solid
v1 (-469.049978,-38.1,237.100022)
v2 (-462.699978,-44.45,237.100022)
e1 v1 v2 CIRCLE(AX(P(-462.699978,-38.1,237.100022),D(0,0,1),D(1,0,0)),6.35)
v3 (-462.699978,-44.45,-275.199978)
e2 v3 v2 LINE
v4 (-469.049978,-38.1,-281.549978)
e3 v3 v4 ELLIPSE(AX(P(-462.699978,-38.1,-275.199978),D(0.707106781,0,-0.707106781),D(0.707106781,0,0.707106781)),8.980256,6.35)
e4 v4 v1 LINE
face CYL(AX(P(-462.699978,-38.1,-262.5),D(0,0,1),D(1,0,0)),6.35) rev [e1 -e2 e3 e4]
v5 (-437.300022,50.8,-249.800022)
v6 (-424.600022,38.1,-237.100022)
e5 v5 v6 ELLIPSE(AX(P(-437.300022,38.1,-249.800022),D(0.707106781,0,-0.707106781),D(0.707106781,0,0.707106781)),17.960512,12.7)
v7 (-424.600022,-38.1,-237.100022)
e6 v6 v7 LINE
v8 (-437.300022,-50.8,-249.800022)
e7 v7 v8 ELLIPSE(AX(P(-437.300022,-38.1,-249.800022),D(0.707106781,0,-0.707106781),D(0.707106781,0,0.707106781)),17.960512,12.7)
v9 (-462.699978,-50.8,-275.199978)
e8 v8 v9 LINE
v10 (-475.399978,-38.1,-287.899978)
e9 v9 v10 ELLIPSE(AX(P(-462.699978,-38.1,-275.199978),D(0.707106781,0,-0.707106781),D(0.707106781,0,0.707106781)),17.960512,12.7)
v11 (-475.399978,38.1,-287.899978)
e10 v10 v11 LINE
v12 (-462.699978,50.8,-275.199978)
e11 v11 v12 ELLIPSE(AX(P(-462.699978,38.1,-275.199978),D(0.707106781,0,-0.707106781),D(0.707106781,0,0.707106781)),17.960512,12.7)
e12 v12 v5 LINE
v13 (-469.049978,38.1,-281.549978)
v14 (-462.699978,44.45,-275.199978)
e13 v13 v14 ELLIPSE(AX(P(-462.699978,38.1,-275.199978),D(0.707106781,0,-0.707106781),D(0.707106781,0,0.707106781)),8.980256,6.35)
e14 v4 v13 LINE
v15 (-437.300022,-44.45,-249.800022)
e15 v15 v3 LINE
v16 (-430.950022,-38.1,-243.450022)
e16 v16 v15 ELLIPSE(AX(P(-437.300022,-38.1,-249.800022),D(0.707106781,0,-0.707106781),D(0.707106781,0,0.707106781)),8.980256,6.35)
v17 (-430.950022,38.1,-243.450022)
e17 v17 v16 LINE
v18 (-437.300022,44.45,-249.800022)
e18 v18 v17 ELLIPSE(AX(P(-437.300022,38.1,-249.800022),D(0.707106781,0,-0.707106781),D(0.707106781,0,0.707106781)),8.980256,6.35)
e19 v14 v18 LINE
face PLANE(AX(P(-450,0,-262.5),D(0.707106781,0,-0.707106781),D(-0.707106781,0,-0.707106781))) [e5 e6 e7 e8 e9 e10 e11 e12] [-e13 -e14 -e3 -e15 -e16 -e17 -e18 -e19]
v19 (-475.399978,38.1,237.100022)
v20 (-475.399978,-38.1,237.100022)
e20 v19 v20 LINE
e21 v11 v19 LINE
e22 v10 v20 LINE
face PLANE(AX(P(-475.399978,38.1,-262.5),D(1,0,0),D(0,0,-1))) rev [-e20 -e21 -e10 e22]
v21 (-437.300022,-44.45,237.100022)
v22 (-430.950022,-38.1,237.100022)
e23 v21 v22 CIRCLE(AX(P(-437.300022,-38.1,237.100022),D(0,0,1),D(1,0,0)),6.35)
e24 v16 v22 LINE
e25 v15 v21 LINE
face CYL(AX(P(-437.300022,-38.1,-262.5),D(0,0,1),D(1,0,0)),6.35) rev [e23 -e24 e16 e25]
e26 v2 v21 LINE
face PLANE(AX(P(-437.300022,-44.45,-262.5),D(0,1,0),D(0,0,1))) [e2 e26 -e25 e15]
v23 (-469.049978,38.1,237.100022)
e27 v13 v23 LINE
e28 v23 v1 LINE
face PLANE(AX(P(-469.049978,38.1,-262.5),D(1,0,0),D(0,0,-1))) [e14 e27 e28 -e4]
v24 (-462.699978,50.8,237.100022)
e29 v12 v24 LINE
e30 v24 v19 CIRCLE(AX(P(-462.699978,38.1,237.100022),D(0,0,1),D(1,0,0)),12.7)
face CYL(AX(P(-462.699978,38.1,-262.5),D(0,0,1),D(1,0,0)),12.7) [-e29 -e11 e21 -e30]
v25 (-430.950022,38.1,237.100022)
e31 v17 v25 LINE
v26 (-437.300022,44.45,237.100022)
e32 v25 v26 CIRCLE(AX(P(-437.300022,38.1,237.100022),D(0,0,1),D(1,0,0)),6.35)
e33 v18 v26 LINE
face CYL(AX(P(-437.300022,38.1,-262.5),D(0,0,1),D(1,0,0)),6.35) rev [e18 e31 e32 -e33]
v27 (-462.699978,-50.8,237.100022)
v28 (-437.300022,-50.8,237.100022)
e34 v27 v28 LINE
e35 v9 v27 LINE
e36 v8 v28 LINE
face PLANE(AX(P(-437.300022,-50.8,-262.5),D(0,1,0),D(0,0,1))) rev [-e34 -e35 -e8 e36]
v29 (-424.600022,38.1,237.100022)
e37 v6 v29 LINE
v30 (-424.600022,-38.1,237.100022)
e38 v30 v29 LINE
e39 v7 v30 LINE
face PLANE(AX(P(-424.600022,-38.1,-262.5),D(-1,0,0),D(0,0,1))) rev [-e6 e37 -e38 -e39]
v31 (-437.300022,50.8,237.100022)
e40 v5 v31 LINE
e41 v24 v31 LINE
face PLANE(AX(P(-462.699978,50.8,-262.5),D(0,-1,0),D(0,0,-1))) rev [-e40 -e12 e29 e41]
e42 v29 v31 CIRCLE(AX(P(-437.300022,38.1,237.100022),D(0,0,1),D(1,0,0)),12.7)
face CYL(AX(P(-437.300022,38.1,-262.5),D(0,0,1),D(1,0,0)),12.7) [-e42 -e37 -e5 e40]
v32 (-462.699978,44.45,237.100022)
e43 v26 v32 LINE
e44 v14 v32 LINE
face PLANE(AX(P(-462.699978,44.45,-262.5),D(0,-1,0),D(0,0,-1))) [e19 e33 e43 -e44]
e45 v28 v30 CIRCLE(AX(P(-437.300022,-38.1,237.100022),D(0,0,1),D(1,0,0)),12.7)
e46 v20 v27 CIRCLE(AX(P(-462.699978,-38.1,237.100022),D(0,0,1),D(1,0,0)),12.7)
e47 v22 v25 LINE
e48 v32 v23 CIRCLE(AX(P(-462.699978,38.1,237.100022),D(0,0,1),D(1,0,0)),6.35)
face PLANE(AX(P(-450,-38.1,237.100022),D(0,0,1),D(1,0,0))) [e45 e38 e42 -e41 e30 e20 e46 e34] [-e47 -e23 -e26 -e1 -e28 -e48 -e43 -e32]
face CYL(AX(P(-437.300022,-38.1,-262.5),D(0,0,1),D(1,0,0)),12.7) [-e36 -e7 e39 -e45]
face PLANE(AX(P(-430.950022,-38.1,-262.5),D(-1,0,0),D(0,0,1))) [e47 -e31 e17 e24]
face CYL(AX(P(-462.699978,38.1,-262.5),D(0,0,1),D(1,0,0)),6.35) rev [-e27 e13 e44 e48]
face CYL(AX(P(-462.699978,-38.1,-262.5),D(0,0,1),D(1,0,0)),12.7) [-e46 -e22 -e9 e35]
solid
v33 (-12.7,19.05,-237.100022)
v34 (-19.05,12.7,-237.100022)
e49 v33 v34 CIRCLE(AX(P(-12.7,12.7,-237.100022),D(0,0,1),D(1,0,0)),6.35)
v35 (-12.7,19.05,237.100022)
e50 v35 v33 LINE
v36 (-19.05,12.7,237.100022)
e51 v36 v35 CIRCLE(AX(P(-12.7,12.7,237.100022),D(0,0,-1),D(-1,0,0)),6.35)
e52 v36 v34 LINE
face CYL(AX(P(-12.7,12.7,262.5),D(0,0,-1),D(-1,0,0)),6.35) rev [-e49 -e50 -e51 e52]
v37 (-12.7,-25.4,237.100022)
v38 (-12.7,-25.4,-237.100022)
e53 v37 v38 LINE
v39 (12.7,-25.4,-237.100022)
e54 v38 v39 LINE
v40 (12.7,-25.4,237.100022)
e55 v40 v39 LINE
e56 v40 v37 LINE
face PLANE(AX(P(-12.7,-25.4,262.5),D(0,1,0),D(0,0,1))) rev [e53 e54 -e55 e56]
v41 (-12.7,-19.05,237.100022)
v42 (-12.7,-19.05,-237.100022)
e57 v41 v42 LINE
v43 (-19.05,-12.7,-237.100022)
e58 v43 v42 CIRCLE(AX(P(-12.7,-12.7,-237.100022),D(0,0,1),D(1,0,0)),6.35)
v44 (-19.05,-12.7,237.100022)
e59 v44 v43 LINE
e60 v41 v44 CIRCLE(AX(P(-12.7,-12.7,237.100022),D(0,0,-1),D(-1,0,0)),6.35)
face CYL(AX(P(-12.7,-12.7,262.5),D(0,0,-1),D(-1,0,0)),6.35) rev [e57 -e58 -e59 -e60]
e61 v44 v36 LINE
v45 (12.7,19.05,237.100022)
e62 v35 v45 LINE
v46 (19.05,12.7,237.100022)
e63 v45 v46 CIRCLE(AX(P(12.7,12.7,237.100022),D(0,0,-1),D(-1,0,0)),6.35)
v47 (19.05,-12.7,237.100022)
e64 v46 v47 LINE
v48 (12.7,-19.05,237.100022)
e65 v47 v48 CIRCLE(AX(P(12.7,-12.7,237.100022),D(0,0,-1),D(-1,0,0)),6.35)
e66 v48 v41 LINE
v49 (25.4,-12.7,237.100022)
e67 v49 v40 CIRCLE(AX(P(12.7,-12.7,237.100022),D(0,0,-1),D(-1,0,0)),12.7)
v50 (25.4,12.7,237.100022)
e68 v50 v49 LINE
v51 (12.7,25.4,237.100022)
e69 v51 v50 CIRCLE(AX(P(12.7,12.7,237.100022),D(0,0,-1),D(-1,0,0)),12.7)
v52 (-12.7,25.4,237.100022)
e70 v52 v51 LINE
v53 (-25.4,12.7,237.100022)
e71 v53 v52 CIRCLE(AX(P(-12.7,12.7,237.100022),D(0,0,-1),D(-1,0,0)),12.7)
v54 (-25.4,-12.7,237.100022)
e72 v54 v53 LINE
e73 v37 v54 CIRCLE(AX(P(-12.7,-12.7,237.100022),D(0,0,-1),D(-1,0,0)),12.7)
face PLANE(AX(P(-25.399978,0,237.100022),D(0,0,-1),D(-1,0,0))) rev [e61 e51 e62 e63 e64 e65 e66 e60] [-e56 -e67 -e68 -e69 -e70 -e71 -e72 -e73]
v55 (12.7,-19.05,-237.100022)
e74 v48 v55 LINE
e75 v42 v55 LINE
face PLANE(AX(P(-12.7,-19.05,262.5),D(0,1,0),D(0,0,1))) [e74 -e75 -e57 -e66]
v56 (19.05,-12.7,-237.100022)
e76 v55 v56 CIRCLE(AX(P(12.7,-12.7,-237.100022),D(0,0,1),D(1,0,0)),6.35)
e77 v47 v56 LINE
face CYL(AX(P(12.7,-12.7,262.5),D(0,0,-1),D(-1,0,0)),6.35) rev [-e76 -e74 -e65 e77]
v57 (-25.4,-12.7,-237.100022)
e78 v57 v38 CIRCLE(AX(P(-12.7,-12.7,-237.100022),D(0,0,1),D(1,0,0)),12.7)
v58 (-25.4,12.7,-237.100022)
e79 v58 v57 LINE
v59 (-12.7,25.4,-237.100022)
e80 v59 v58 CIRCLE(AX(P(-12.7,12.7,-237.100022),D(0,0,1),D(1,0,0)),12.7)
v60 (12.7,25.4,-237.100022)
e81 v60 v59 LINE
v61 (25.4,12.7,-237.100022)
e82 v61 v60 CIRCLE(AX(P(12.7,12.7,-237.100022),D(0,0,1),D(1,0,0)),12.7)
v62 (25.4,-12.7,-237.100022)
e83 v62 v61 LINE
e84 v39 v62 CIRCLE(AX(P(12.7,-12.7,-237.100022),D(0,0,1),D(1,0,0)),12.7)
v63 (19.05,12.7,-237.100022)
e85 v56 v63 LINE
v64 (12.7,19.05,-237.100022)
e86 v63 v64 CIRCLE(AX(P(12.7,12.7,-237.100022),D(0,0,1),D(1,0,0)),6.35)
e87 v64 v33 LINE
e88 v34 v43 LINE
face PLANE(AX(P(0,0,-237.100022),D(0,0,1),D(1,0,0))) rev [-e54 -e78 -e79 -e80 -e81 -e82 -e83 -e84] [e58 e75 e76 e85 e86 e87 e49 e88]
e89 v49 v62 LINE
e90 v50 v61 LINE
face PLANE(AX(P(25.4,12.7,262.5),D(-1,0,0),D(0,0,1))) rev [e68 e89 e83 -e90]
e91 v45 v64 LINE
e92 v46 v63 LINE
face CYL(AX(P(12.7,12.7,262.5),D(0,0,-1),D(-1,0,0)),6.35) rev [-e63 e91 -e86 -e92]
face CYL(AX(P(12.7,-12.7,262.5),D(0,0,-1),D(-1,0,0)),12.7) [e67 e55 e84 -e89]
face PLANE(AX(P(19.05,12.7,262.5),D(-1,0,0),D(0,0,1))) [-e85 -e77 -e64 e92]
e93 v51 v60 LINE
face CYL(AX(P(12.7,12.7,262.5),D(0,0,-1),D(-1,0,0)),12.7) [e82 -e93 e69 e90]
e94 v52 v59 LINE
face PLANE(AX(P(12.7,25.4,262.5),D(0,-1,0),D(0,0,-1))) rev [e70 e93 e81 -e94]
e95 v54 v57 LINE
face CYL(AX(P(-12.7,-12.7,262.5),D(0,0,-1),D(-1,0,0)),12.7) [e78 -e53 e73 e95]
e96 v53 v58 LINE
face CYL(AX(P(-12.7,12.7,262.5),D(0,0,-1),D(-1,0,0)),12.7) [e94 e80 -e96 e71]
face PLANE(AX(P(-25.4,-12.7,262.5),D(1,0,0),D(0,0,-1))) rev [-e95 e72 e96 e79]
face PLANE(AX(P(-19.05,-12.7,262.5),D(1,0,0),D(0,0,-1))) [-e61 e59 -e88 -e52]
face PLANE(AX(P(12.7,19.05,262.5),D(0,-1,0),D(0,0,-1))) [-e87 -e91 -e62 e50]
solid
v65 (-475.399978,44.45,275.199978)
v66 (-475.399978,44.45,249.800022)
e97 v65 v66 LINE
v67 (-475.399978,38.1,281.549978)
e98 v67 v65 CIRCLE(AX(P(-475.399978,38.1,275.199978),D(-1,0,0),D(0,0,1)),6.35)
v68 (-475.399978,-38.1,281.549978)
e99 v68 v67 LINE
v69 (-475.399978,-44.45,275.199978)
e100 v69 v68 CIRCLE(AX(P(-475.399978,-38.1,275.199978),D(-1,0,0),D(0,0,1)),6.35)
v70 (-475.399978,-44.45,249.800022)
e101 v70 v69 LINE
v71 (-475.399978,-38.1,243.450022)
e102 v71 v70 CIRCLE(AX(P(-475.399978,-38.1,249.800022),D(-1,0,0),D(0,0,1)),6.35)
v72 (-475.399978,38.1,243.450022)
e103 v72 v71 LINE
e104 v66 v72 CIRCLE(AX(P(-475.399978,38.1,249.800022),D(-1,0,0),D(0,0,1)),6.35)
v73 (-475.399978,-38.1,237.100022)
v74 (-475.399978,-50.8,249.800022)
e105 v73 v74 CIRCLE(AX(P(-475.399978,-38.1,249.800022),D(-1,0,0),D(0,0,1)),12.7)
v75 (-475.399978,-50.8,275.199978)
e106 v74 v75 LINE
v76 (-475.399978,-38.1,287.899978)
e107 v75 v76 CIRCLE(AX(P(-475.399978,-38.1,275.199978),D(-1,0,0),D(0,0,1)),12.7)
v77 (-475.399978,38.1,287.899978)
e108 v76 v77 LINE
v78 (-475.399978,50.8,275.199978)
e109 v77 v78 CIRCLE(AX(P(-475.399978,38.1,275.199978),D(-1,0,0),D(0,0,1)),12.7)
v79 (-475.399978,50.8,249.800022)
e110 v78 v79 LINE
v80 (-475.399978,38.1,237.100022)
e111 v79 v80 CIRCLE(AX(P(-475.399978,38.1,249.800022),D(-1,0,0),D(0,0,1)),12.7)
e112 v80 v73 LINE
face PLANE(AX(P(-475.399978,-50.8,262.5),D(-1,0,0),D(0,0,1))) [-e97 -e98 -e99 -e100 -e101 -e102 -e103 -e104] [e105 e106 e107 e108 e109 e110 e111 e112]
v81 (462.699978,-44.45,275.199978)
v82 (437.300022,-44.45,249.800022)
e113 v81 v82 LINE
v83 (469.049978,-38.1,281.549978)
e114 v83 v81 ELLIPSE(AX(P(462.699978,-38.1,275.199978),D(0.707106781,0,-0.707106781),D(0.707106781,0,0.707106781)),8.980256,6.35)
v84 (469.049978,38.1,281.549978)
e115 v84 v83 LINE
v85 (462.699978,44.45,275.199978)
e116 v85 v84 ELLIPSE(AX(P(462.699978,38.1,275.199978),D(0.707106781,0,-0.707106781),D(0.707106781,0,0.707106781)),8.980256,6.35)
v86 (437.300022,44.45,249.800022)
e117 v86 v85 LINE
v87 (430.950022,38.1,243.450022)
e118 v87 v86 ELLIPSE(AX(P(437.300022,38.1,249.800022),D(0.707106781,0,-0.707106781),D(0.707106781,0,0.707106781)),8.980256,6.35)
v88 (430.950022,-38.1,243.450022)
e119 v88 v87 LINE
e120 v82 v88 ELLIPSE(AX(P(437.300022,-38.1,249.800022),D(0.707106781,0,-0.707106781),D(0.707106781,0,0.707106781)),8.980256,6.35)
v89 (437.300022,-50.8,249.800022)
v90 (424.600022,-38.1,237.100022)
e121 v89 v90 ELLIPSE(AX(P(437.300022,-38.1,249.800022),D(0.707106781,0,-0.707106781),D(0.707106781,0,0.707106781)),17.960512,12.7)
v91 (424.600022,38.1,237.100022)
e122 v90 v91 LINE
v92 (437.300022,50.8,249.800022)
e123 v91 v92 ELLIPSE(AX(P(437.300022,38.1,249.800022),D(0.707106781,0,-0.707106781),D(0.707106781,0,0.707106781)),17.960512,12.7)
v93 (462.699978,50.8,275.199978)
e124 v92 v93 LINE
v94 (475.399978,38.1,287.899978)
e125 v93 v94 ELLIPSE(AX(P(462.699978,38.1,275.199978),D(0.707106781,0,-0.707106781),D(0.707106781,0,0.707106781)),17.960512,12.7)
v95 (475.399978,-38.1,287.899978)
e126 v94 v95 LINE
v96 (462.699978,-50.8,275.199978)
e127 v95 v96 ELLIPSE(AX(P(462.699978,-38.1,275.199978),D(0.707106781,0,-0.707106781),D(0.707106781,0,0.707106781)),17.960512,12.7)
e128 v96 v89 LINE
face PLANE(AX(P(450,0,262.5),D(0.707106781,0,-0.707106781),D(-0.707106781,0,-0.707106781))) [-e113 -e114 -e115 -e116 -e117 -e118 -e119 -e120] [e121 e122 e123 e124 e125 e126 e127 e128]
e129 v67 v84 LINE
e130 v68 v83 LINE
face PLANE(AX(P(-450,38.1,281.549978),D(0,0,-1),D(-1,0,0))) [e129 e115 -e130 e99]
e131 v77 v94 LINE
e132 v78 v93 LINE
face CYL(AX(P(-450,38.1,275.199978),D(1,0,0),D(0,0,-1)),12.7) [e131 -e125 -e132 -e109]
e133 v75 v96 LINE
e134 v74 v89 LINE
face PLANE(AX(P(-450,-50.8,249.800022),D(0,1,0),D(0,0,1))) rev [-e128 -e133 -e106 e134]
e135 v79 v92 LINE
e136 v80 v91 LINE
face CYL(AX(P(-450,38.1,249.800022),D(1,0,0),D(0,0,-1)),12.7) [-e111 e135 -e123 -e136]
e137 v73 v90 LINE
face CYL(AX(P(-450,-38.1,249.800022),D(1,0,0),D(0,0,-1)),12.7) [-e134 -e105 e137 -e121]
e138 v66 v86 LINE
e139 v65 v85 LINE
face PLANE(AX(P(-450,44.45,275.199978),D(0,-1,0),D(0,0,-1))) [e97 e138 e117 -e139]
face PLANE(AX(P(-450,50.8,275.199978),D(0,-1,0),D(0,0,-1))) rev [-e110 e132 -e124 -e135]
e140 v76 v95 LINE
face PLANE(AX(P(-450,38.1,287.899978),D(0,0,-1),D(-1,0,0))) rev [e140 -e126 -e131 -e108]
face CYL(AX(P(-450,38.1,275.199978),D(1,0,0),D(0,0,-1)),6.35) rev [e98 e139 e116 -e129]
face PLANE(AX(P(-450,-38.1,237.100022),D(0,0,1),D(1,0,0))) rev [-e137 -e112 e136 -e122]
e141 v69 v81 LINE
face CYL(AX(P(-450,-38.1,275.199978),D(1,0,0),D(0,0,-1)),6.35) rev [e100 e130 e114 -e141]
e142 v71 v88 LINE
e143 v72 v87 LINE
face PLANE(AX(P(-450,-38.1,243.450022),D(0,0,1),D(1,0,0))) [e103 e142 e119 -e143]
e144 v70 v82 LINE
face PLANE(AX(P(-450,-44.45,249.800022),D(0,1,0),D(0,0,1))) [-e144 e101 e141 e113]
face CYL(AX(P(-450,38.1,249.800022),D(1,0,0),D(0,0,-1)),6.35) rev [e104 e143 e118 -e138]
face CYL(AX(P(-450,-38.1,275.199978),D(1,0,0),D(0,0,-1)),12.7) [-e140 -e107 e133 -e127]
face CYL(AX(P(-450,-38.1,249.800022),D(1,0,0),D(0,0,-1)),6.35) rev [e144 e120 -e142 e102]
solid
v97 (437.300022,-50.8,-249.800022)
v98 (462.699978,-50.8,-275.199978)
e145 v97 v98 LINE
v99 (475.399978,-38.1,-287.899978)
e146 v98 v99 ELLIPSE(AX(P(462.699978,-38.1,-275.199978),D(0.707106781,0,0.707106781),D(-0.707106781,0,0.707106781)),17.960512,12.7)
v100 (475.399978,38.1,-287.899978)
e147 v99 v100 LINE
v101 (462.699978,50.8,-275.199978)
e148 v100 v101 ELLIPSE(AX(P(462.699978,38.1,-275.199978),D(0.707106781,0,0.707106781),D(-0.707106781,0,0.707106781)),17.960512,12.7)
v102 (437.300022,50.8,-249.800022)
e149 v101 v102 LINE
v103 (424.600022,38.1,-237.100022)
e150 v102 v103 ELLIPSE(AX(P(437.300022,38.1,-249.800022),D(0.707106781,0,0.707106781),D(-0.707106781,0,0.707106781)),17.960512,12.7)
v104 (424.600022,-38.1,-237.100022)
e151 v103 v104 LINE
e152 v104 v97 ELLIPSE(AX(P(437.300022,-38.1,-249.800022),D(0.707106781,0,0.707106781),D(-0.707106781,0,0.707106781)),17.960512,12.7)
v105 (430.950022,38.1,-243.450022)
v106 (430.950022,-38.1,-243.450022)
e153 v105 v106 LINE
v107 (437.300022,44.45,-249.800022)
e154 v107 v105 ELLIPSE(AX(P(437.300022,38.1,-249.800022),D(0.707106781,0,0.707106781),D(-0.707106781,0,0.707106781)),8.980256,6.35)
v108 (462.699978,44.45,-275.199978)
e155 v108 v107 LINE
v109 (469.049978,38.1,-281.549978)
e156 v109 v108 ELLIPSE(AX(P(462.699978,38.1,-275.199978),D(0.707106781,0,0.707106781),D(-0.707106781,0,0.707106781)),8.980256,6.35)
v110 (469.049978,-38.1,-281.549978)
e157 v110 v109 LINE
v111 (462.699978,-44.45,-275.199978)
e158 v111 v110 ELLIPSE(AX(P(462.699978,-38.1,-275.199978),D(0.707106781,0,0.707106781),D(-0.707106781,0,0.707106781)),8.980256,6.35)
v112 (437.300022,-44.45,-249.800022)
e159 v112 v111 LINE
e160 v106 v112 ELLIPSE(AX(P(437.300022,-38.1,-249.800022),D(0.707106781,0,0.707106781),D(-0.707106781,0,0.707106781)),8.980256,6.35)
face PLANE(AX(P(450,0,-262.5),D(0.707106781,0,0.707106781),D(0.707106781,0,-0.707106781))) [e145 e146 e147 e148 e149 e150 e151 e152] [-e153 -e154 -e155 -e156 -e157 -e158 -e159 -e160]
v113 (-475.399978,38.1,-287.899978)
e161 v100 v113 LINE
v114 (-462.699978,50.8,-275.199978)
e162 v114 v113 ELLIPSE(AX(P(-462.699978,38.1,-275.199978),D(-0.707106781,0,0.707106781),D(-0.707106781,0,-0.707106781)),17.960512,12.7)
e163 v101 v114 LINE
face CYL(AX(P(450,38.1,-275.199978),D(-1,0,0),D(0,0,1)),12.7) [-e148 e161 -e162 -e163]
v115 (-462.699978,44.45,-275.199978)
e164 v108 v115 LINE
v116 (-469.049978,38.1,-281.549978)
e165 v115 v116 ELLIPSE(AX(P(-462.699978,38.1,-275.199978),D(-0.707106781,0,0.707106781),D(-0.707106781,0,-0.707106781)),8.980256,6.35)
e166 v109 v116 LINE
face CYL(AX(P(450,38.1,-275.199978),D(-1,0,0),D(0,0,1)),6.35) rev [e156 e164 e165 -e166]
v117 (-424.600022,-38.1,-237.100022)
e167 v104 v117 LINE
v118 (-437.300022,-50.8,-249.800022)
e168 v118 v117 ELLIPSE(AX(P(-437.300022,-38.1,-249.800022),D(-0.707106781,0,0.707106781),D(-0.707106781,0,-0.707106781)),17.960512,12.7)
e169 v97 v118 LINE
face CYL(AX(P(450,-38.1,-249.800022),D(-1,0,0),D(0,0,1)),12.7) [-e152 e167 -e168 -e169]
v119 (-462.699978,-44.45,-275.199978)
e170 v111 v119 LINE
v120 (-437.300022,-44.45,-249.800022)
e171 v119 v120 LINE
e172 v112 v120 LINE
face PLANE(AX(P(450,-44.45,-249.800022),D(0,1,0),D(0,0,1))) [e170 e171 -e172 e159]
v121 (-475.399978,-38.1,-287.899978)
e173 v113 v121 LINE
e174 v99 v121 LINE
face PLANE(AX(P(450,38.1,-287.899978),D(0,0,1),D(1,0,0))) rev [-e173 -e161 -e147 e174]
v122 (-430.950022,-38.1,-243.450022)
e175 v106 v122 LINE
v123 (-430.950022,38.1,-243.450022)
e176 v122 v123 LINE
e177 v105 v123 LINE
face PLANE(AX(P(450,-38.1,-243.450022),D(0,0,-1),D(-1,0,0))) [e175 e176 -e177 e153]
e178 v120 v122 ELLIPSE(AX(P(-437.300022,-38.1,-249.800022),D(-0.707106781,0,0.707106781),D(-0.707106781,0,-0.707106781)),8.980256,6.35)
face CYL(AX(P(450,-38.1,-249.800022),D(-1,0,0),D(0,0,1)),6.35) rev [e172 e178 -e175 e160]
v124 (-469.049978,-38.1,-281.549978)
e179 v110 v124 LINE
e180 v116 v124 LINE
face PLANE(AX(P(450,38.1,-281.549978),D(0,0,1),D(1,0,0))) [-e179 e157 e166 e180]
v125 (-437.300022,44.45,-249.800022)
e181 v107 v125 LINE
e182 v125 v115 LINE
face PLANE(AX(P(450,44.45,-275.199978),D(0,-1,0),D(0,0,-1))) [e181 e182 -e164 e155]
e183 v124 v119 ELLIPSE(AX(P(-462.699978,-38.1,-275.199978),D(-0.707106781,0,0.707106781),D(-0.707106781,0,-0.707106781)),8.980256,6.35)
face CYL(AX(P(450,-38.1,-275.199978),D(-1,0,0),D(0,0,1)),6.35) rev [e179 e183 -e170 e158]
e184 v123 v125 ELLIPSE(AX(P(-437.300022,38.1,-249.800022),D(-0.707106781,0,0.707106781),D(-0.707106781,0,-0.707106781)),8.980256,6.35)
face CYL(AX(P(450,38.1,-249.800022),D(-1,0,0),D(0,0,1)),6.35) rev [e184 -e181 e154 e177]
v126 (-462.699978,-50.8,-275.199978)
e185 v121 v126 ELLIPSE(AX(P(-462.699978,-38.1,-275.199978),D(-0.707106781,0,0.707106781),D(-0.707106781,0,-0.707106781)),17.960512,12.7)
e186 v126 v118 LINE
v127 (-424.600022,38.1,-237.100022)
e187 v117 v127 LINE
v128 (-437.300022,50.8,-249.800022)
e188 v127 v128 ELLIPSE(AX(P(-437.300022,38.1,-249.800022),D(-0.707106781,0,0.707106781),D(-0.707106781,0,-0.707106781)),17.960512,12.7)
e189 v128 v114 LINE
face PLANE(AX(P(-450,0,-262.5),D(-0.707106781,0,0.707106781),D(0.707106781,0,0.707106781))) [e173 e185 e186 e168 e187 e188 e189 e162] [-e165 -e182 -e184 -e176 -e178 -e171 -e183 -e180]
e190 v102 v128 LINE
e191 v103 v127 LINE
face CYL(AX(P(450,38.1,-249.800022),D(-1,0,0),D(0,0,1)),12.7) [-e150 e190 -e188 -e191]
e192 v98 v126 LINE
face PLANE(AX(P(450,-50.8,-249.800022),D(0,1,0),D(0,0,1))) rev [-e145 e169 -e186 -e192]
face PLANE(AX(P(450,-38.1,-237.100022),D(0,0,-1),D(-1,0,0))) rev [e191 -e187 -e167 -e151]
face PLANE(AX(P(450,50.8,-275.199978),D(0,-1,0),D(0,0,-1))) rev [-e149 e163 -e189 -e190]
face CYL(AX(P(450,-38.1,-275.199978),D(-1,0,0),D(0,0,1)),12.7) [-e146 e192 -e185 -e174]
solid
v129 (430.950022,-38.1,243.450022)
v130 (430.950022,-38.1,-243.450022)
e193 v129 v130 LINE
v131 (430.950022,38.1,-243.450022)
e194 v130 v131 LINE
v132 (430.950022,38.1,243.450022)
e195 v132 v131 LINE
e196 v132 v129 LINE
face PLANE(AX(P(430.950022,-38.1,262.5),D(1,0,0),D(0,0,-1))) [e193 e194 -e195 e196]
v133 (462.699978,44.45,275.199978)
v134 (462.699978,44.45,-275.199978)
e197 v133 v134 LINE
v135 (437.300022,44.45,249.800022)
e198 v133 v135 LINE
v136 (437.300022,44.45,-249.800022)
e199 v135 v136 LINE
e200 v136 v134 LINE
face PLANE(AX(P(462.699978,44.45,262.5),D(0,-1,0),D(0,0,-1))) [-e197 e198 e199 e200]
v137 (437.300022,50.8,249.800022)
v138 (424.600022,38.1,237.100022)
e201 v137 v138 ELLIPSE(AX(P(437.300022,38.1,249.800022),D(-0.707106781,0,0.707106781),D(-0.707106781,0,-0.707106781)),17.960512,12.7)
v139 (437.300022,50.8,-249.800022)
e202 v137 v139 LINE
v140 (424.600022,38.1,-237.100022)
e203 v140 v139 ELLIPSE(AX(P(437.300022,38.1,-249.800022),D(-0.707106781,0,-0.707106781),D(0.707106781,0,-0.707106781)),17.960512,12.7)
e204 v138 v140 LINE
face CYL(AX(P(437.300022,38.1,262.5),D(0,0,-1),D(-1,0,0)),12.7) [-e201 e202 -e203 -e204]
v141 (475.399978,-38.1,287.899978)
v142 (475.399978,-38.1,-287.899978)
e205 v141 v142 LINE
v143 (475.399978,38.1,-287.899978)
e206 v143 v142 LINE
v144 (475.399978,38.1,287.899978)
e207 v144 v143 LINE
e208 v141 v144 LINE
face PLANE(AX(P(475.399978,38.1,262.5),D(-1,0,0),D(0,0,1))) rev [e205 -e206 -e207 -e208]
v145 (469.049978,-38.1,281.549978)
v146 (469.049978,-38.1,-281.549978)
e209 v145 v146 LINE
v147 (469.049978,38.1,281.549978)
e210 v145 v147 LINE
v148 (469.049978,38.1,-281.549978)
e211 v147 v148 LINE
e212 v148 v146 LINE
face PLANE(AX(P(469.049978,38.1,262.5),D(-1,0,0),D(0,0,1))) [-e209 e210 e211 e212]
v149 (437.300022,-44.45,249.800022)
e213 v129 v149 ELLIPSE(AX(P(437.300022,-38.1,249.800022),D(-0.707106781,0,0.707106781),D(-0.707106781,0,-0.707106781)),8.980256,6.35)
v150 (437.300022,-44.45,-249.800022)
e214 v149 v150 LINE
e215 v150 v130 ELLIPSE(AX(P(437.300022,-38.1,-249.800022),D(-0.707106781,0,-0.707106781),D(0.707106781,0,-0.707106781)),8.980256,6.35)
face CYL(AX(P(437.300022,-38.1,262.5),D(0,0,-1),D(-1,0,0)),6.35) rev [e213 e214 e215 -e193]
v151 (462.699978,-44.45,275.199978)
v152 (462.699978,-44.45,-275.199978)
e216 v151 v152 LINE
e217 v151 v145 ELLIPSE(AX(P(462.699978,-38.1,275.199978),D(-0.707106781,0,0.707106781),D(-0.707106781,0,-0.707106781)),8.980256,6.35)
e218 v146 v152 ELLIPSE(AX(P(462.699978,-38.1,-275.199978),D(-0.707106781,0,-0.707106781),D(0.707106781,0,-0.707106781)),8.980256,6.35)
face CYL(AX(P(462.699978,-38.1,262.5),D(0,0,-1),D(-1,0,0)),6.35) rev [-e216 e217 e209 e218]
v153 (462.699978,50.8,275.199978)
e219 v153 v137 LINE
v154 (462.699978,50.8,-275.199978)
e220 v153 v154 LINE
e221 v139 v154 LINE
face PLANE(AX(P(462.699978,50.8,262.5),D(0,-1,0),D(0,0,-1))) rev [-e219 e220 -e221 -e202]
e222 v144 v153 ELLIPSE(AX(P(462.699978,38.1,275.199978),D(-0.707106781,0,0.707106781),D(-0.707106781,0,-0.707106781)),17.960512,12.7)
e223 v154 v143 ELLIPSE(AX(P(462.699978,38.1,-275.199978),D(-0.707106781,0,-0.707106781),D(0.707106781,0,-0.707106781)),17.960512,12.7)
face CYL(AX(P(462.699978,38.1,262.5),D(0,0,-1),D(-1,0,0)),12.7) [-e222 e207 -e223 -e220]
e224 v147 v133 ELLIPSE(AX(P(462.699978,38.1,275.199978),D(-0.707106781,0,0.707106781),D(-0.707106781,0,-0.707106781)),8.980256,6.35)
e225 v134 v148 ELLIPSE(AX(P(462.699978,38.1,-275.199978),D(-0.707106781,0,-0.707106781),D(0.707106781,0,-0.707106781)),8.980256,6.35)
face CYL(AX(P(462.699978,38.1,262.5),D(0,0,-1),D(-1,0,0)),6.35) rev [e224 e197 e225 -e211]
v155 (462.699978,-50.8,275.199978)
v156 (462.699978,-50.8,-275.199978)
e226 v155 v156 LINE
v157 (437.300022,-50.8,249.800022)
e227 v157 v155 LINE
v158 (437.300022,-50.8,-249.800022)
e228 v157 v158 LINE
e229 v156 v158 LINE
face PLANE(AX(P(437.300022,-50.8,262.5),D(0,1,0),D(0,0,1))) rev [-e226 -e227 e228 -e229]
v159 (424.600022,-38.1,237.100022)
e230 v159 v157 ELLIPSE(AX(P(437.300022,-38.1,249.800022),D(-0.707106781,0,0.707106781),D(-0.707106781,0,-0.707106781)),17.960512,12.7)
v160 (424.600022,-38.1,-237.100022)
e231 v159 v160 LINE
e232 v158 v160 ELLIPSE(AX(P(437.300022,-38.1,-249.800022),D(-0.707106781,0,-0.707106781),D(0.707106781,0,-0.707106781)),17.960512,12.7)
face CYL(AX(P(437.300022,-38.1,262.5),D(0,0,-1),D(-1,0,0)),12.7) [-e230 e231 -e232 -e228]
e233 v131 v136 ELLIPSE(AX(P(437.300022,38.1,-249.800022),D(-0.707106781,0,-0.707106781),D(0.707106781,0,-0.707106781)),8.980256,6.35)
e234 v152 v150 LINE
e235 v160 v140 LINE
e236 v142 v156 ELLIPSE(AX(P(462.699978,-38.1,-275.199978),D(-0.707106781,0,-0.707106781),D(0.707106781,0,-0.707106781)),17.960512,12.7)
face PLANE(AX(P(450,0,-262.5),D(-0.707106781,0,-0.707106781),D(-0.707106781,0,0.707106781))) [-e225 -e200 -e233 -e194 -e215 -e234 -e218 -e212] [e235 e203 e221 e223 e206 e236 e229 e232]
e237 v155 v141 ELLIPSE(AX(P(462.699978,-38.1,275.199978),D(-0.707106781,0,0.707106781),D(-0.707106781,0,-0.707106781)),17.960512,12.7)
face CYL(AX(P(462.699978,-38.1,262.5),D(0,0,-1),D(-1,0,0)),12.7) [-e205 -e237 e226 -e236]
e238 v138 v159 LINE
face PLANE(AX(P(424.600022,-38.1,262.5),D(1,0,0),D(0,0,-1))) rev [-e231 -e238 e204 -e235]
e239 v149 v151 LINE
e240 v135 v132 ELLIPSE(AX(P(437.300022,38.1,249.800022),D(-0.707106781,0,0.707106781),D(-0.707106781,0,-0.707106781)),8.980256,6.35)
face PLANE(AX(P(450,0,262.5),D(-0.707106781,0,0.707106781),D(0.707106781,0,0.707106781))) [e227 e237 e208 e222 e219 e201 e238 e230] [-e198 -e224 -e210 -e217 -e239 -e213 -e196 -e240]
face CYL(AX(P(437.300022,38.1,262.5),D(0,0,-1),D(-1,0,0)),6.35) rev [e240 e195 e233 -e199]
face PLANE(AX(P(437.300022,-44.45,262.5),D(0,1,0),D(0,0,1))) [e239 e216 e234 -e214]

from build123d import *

# Parameters (mm, degrees)
RECTANGULAR_START                          = -287.899978029
RECTANGULAR_TUBE_4_X_2_X_0_25_1_DEPTH      = 525
RECTANGULAR_START_2                        = -132.582521472
RECTANGULAR_TUBE_4_X_2_X_0_25_1_2_OUTLIN_W = 75
RECTANGULAR_TUBE_4_X_2_X_0_25_1_2_OUTLIN_H = 104
RECTANGULAR_TUBE_4_X_2_X_0_25_1_2_DEPTH    = 36.582521472
RECTANGULAR_START_3                        = -475.399978029
RECTANGULAR_TUBE_4_X_2_X_0_25_1_3_DEPTH    = 950.799956058
RECTANGULAR_START_4                        = 132.582521472
RECTANGULAR_TUBE_4_X_2_X_0_25_1_4_OUTLIN_W = 75
RECTANGULAR_TUBE_4_X_2_X_0_25_1_4_OUTLIN_H = 104
RECTANGULAR_TUBE_4_X_2_X_0_25_1_4_DEPTH    = 37.417478528
RECTANGULAR_TUBE_4_X_2_X_0_25_1_5_DEPTH    = 950.799956058
RECTANGULAR_TUBE_4_X_2_X_0_25_1_6_OUTLIN_W = 673.582521472
RECTANGULAR_TUBE_4_X_2_X_0_25_1_6_OUTLIN_H = 104
RECTANGULAR_TUBE_4_X_2_X_0_25_1_6_DEPTH    = 37.417478528
RECTANGULAR_START_5                        = -541
RECTANGULAR_TUBE_4_X_2_X_0_25_1_7_OUTLIN_W = 37.417478528
RECTANGULAR_TUBE_4_X_2_X_0_25_1_7_OUTLIN_H = 104
RECTANGULAR_TUBE_4_X_2_X_0_25_1_7_DEPTH    = 673.582521472
RECTANGULAR_TUBE_4_X_2_X_0_25_1_8_DEPTH    = 575.799956058
RECTANGULAR_START_6                        = 96
RECTANGULAR_TUBE_4_X_2_X_0_25_1_9_OUTLIN_W = 408.417478528
RECTANGULAR_TUBE_4_X_2_X_0_25_1_9_OUTLIN_H = 104
RECTANGULAR_TUBE_4_X_2_X_0_25_1_9_DEPTH    = 36.582521472
RECTANGULAR_TUBE_4_X_2_X_0_25_1_10_OUTLI_W = 37.582521472
RECTANGULAR_TUBE_4_X_2_X_0_25_1_10_OUTLI_H = 104
RECTANGULAR_TUBE_4_X_2_X_0_25_1_10_DEPTH   = 408.417478528
SQUARE_TUBE_2_X_2_X_0_25_1_DEPTH           = 525


with BuildPart() as part:
    # Rectangular tube 4 X 2 X 0.25(1): read off the stored shape, not the designer's step
    # Rectangular tube 4 X 2 X 0.25(1) outline → Rectangular tube 4 X 2 X 0.25(1) (new body)
    with BuildSketch(Plane.XY.offset(RECTANGULAR_START)):
        with BuildLine():
            Line((-475.399978029, 38.1), (-475.399978029, -38.1))
            ThreePointArc((-475.399978029, -38.1), (-471.68023415, -47.080256121), (-462.699978029, -50.8))
            Line((-462.699978029, -50.8), (-437.300021971, -50.8))
            ThreePointArc((-437.300021971, -50.8), (-428.31976585, -47.080256121), (-424.600021971, -38.1))
            Line((-424.600021971, -38.1), (-424.600021971, 38.1))
            ThreePointArc((-424.600021971, 38.1), (-428.31976585, 47.080256121), (-437.300021971, 50.8))
            Line((-437.300021971, 50.8), (-462.699978029, 50.8))
            ThreePointArc((-462.699978029, 50.8), (-471.68023415, 47.080256121), (-475.399978029, 38.1))
        make_face()
        with BuildLine():
            ThreePointArc((-437.300021971, 44.45), (-432.80989391, 42.590128061), (-430.950021971, 38.1))
            Line((-430.950021971, 38.1), (-430.950021971, -38.1))
            ThreePointArc((-430.950021971, -38.1), (-432.80989391, -42.590128061), (-437.300021971, -44.45))
            Line((-437.300021971, -44.45), (-462.699978029, -44.45))
            ThreePointArc((-462.699978029, -44.45), (-467.19010609, -42.590128061), (-469.049978029, -38.1))
            Line((-469.049978029, -38.1), (-469.049978029, 38.1))
            ThreePointArc((-469.049978029, 38.1), (-467.19010609, 42.590128061), (-462.699978029, 44.45))
            Line((-462.699978029, 44.45), (-437.300021971, 44.45))
        make_face(mode=Mode.SUBTRACT)
    extrude(amount=RECTANGULAR_TUBE_4_X_2_X_0_25_1_DEPTH)

    # Rectangular tube 4 X 2 X 0.25_1 2 outlin → Rectangular tube 4 X 2 X 0.25_1 2 (cut)
    with BuildSketch(Plane(origin=(0, 0, 0), x_dir=(0.707106781186548, 0, 0.707106781186547), z_dir=(0.707106781186547, 0, -0.707106781186548)).offset(RECTANGULAR_START_2)):
        with Locations((-503.5, 0)):
            Rectangle(RECTANGULAR_TUBE_4_X_2_X_0_25_1_2_OUTLIN_W, RECTANGULAR_TUBE_4_X_2_X_0_25_1_2_OUTLIN_H)
    extrude(amount=RECTANGULAR_TUBE_4_X_2_X_0_25_1_2_DEPTH, mode=Mode.SUBTRACT)


with BuildPart() as body_2:
    # Rectangular tube 4 X 2 X 0.25_1 3 outlin → Rectangular tube 4 X 2 X 0.25_1 3 (new body)
    with BuildSketch(Plane.YZ.offset(RECTANGULAR_START_3)):
        with BuildLine():
            Line((50.8, 249.800021971), (50.8, 275.199978029))
            ThreePointArc((50.8, 275.199978029), (47.080256121, 284.18023415), (38.1, 287.899978029))
            Line((38.1, 287.899978029), (-38.1, 287.899978029))
            ThreePointArc((-38.1, 287.899978029), (-47.080256121, 284.18023415), (-50.8, 275.199978029))
            Line((-50.8, 275.199978029), (-50.8, 249.800021971))
            ThreePointArc((-50.8, 249.800021971), (-47.080256121, 240.81976585), (-38.1, 237.100021971))
            Line((-38.1, 237.100021971), (38.1, 237.100021971))
            ThreePointArc((38.1, 237.100021971), (47.080256121, 240.81976585), (50.8, 249.800021971))
        make_face()
        with BuildLine():
            ThreePointArc((44.45, 249.800021971), (42.590128061, 245.30989391), (38.1, 243.450021971))
            Line((38.1, 243.450021971), (-38.1, 243.450021971))
            ThreePointArc((-38.1, 243.450021971), (-42.590128061, 245.30989391), (-44.45, 249.800021971))
            Line((-44.45, 249.800021971), (-44.45, 275.199978029))
            ThreePointArc((-44.45, 275.199978029), (-42.590128061, 279.69010609), (-38.1, 281.549978029))
            Line((-38.1, 281.549978029), (38.1, 281.549978029))
            ThreePointArc((38.1, 281.549978029), (42.590128061, 279.69010609), (44.45, 275.199978029))
            Line((44.45, 275.199978029), (44.45, 249.800021971))
        make_face(mode=Mode.SUBTRACT)
    extrude(amount=RECTANGULAR_TUBE_4_X_2_X_0_25_1_3_DEPTH)

    # Rectangular tube 4 X 2 X 0.25_1 4 outlin → Rectangular tube 4 X 2 X 0.25_1 4 (cut)
    with BuildSketch(Plane(origin=(0, 0, 0), x_dir=(0.707106781186548, 0, 0.707106781186547), z_dir=(0.707106781186547, 0, -0.707106781186548)).offset(RECTANGULAR_START_4)):
        with Locations((503.5, 0)):
            Rectangle(RECTANGULAR_TUBE_4_X_2_X_0_25_1_4_OUTLIN_W, RECTANGULAR_TUBE_4_X_2_X_0_25_1_4_OUTLIN_H)
    extrude(amount=RECTANGULAR_TUBE_4_X_2_X_0_25_1_4_DEPTH, mode=Mode.SUBTRACT)


with BuildPart() as body_3:
    # Rectangular tube 4 X 2 X 0.25_1 5 outlin → Rectangular tube 4 X 2 X 0.25_1 5 (new body)
    with BuildSketch(Plane.YZ.offset(RECTANGULAR_START_3)):
        with BuildLine():
            ThreePointArc((38.1, -287.899978029), (47.080256121, -284.18023415), (50.8, -275.199978029))
            Line((50.8, -275.199978029), (50.8, -249.800021971))
            ThreePointArc((50.8, -249.800021971), (47.080256121, -240.81976585), (38.1, -237.100021971))
            Line((38.1, -237.100021971), (-38.1, -237.100021971))
            ThreePointArc((-38.1, -237.100021971), (-47.080256121, -240.81976585), (-50.8, -249.800021971))
            Line((-50.8, -249.800021971), (-50.8, -275.199978029))
            ThreePointArc((-50.8, -275.199978029), (-47.080256121, -284.18023415), (-38.1, -287.899978029))
            Line((-38.1, -287.899978029), (38.1, -287.899978029))
        make_face()
        with BuildLine():
            Line((-38.1, -243.450021971), (38.1, -243.450021971))
            ThreePointArc((38.1, -243.450021971), (42.590128061, -245.30989391), (44.45, -249.800021971))
            Line((44.45, -249.800021971), (44.45, -275.199978029))
            ThreePointArc((44.45, -275.199978029), (42.590128061, -279.69010609), (38.1, -281.549978029))
            Line((38.1, -281.549978029), (-38.1, -281.549978029))
            ThreePointArc((-38.1, -281.549978029), (-42.590128061, -279.69010609), (-44.45, -275.199978029))
            Line((-44.45, -275.199978029), (-44.45, -249.800021971))
            ThreePointArc((-44.45, -249.800021971), (-42.590128061, -245.30989391), (-38.1, -243.450021971))
        make_face(mode=Mode.SUBTRACT)
    extrude(amount=RECTANGULAR_TUBE_4_X_2_X_0_25_1_5_DEPTH)

    # Rectangular tube 4 X 2 X 0.25_1 6 outlin → Rectangular tube 4 X 2 X 0.25_1 6 (cut)
    with BuildSketch(Plane(origin=(0, 0, 0), x_dir=(0.7071067811865471, 0, -0.707106781186548), z_dir=(0.707106781186548, 0, 0.707106781186547)).offset(RECTANGULAR_START_4)):
        with Locations((204.208739264, 0)):
            Rectangle(RECTANGULAR_TUBE_4_X_2_X_0_25_1_6_OUTLIN_W, RECTANGULAR_TUBE_4_X_2_X_0_25_1_6_OUTLIN_H)
    extrude(amount=RECTANGULAR_TUBE_4_X_2_X_0_25_1_6_DEPTH, mode=Mode.SUBTRACT)

    # Rectangular tube 4 X 2 X 0.25_1 7 outlin → Rectangular tube 4 X 2 X 0.25_1 7 (cut)
    with BuildSketch(Plane(origin=(0, 0, 0), x_dir=(0.7071067811865471, 0, -0.707106781186548), z_dir=(0.707106781186548, 0, 0.707106781186547)).offset(RECTANGULAR_START_5)):
        with Locations((-151.291260736, 0)):
            Rectangle(RECTANGULAR_TUBE_4_X_2_X_0_25_1_7_OUTLIN_W, RECTANGULAR_TUBE_4_X_2_X_0_25_1_7_OUTLIN_H)
    extrude(amount=RECTANGULAR_TUBE_4_X_2_X_0_25_1_7_DEPTH, mode=Mode.SUBTRACT)


with BuildPart() as body_4:
    # Rectangular tube 4 X 2 X 0.25_1 8 outlin → Rectangular tube 4 X 2 X 0.25_1 8 (new body)
    with BuildSketch(Plane.XY.offset(RECTANGULAR_START)):
        with BuildLine():
            ThreePointArc((475.399978029, 38.1), (471.68023415, 47.080256121), (462.699978029, 50.8))
            Line((462.699978029, 50.8), (437.300021971, 50.8))
            ThreePointArc((437.300021971, 50.8), (428.31976585, 47.080256121), (424.600021971, 38.1))
            Line((424.600021971, 38.1), (424.600021971, -38.1))
            ThreePointArc((424.600021971, -38.1), (428.31976585, -47.080256121), (437.300021971, -50.8))
            Line((437.300021971, -50.8), (462.699978029, -50.8))
            ThreePointArc((462.699978029, -50.8), (471.68023415, -47.080256121), (475.399978029, -38.1))
            Line((475.399978029, -38.1), (475.399978029, 38.1))
        make_face()
        with BuildLine():
            Line((430.950021971, -38.1), (430.950021971, 38.1))
            ThreePointArc((430.950021971, 38.1), (432.80989391, 42.590128061), (437.300021971, 44.45))
            Line((437.300021971, 44.45), (462.699978029, 44.45))
            ThreePointArc((462.699978029, 44.45), (467.19010609, 42.590128061), (469.049978029, 38.1))
            Line((469.049978029, 38.1), (469.049978029, -38.1))
            ThreePointArc((469.049978029, -38.1), (467.19010609, -42.590128061), (462.699978029, -44.45))
            Line((462.699978029, -44.45), (437.300021971, -44.45))
            ThreePointArc((437.300021971, -44.45), (432.80989391, -42.590128061), (430.950021971, -38.1))
        make_face(mode=Mode.SUBTRACT)
    extrude(amount=RECTANGULAR_TUBE_4_X_2_X_0_25_1_8_DEPTH)

    # Rectangular tube 4 X 2 X 0.25_1 9 outlin → Rectangular tube 4 X 2 X 0.25_1 9 (cut)
    with BuildSketch(Plane(origin=(0, 0, 0), x_dir=(0.707106781186548, 0, 0.707106781186547), z_dir=(0.707106781186547, 0, -0.707106781186548)).offset(RECTANGULAR_START_6)):
        with Locations((336.791260736, 0)):
            Rectangle(RECTANGULAR_TUBE_4_X_2_X_0_25_1_9_OUTLIN_W, RECTANGULAR_TUBE_4_X_2_X_0_25_1_9_OUTLIN_H)
    extrude(amount=RECTANGULAR_TUBE_4_X_2_X_0_25_1_9_DEPTH, mode=Mode.SUBTRACT)

    # Rectangular tube 4 X 2 X 0.25_1 10 outli → Rectangular tube 4 X 2 X 0.25_1 10 (cut)
    with BuildSketch(Plane(origin=(0, 0, 0), x_dir=(0.707106781186548, 0, 0.707106781186547), z_dir=(0.707106781186547, 0, -0.707106781186548)).offset(RECTANGULAR_START_4)):
        with Locations((113.791260736, 0)):
            Rectangle(RECTANGULAR_TUBE_4_X_2_X_0_25_1_10_OUTLI_W, RECTANGULAR_TUBE_4_X_2_X_0_25_1_10_OUTLI_H)
    extrude(amount=RECTANGULAR_TUBE_4_X_2_X_0_25_1_10_DEPTH, mode=Mode.SUBTRACT)


with BuildPart() as body_5:
    # Sketch12 → Square tube 2 X 2 X 0.25(1) (new body)
    with BuildSketch(Plane.XY.offset(-262.5)):
        with BuildLine():
            Line((-12.7, -25.4), (12.7, -25.4))
            ThreePointArc((12.7, -25.4), (21.680256121, -21.680256121), (25.4, -12.7))
            Line((25.4, -12.7), (25.4, 12.7))
            ThreePointArc((25.4, 12.7), (21.680256121, 21.680256121), (12.7, 25.4))
            Line((12.7, 25.4), (-12.7, 25.4))
            ThreePointArc((-12.7, 25.4), (-21.680256121, 21.680256121), (-25.4, 12.7))
            Line((-25.4, 12.7), (-25.4, -12.7))
            ThreePointArc((-25.4, -12.7), (-21.680256121, -21.680256121), (-12.7, -25.4))
        make_face()
        with BuildLine():
            Line((-12.7, -19.05), (12.7, -19.05))
            ThreePointArc((12.7, -19.05), (17.190128061, -17.190128061), (19.05, -12.7))
            Line((19.05, -12.7), (19.05, 12.7))
            ThreePointArc((19.05, 12.7), (17.190128061, 17.190128061), (12.7, 19.05))
            Line((12.7, 19.05), (-12.7, 19.05))
            ThreePointArc((-12.7, 19.05), (-17.190128061, 17.190128061), (-19.05, 12.7))
            Line((-19.05, 12.7), (-19.05, -12.7))
            ThreePointArc((-19.05, -12.7), (-17.190128061, -17.190128061), (-12.7, -19.05))
        make_face(mode=Mode.SUBTRACT)
    extrude(amount=SQUARE_TUBE_2_X_2_X_0_25_1_DEPTH)

    # Trim/Extend1
    split(bisect_by=Plane(origin=(-25.399978029, 0, 237.100021971), x_dir=(0, 1, 0), z_dir=(0, 0, -1)), keep=Keep.TOP)

    # Trim_Extend1 3
    split(bisect_by=Plane(origin=(0, 0, -237.100021971), x_dir=(0, -1, 0), z_dir=(0, 0, 1)), keep=Keep.TOP)


solid = Compound([part.part, body_2.part, body_3.part, body_4.part, body_5.part])
